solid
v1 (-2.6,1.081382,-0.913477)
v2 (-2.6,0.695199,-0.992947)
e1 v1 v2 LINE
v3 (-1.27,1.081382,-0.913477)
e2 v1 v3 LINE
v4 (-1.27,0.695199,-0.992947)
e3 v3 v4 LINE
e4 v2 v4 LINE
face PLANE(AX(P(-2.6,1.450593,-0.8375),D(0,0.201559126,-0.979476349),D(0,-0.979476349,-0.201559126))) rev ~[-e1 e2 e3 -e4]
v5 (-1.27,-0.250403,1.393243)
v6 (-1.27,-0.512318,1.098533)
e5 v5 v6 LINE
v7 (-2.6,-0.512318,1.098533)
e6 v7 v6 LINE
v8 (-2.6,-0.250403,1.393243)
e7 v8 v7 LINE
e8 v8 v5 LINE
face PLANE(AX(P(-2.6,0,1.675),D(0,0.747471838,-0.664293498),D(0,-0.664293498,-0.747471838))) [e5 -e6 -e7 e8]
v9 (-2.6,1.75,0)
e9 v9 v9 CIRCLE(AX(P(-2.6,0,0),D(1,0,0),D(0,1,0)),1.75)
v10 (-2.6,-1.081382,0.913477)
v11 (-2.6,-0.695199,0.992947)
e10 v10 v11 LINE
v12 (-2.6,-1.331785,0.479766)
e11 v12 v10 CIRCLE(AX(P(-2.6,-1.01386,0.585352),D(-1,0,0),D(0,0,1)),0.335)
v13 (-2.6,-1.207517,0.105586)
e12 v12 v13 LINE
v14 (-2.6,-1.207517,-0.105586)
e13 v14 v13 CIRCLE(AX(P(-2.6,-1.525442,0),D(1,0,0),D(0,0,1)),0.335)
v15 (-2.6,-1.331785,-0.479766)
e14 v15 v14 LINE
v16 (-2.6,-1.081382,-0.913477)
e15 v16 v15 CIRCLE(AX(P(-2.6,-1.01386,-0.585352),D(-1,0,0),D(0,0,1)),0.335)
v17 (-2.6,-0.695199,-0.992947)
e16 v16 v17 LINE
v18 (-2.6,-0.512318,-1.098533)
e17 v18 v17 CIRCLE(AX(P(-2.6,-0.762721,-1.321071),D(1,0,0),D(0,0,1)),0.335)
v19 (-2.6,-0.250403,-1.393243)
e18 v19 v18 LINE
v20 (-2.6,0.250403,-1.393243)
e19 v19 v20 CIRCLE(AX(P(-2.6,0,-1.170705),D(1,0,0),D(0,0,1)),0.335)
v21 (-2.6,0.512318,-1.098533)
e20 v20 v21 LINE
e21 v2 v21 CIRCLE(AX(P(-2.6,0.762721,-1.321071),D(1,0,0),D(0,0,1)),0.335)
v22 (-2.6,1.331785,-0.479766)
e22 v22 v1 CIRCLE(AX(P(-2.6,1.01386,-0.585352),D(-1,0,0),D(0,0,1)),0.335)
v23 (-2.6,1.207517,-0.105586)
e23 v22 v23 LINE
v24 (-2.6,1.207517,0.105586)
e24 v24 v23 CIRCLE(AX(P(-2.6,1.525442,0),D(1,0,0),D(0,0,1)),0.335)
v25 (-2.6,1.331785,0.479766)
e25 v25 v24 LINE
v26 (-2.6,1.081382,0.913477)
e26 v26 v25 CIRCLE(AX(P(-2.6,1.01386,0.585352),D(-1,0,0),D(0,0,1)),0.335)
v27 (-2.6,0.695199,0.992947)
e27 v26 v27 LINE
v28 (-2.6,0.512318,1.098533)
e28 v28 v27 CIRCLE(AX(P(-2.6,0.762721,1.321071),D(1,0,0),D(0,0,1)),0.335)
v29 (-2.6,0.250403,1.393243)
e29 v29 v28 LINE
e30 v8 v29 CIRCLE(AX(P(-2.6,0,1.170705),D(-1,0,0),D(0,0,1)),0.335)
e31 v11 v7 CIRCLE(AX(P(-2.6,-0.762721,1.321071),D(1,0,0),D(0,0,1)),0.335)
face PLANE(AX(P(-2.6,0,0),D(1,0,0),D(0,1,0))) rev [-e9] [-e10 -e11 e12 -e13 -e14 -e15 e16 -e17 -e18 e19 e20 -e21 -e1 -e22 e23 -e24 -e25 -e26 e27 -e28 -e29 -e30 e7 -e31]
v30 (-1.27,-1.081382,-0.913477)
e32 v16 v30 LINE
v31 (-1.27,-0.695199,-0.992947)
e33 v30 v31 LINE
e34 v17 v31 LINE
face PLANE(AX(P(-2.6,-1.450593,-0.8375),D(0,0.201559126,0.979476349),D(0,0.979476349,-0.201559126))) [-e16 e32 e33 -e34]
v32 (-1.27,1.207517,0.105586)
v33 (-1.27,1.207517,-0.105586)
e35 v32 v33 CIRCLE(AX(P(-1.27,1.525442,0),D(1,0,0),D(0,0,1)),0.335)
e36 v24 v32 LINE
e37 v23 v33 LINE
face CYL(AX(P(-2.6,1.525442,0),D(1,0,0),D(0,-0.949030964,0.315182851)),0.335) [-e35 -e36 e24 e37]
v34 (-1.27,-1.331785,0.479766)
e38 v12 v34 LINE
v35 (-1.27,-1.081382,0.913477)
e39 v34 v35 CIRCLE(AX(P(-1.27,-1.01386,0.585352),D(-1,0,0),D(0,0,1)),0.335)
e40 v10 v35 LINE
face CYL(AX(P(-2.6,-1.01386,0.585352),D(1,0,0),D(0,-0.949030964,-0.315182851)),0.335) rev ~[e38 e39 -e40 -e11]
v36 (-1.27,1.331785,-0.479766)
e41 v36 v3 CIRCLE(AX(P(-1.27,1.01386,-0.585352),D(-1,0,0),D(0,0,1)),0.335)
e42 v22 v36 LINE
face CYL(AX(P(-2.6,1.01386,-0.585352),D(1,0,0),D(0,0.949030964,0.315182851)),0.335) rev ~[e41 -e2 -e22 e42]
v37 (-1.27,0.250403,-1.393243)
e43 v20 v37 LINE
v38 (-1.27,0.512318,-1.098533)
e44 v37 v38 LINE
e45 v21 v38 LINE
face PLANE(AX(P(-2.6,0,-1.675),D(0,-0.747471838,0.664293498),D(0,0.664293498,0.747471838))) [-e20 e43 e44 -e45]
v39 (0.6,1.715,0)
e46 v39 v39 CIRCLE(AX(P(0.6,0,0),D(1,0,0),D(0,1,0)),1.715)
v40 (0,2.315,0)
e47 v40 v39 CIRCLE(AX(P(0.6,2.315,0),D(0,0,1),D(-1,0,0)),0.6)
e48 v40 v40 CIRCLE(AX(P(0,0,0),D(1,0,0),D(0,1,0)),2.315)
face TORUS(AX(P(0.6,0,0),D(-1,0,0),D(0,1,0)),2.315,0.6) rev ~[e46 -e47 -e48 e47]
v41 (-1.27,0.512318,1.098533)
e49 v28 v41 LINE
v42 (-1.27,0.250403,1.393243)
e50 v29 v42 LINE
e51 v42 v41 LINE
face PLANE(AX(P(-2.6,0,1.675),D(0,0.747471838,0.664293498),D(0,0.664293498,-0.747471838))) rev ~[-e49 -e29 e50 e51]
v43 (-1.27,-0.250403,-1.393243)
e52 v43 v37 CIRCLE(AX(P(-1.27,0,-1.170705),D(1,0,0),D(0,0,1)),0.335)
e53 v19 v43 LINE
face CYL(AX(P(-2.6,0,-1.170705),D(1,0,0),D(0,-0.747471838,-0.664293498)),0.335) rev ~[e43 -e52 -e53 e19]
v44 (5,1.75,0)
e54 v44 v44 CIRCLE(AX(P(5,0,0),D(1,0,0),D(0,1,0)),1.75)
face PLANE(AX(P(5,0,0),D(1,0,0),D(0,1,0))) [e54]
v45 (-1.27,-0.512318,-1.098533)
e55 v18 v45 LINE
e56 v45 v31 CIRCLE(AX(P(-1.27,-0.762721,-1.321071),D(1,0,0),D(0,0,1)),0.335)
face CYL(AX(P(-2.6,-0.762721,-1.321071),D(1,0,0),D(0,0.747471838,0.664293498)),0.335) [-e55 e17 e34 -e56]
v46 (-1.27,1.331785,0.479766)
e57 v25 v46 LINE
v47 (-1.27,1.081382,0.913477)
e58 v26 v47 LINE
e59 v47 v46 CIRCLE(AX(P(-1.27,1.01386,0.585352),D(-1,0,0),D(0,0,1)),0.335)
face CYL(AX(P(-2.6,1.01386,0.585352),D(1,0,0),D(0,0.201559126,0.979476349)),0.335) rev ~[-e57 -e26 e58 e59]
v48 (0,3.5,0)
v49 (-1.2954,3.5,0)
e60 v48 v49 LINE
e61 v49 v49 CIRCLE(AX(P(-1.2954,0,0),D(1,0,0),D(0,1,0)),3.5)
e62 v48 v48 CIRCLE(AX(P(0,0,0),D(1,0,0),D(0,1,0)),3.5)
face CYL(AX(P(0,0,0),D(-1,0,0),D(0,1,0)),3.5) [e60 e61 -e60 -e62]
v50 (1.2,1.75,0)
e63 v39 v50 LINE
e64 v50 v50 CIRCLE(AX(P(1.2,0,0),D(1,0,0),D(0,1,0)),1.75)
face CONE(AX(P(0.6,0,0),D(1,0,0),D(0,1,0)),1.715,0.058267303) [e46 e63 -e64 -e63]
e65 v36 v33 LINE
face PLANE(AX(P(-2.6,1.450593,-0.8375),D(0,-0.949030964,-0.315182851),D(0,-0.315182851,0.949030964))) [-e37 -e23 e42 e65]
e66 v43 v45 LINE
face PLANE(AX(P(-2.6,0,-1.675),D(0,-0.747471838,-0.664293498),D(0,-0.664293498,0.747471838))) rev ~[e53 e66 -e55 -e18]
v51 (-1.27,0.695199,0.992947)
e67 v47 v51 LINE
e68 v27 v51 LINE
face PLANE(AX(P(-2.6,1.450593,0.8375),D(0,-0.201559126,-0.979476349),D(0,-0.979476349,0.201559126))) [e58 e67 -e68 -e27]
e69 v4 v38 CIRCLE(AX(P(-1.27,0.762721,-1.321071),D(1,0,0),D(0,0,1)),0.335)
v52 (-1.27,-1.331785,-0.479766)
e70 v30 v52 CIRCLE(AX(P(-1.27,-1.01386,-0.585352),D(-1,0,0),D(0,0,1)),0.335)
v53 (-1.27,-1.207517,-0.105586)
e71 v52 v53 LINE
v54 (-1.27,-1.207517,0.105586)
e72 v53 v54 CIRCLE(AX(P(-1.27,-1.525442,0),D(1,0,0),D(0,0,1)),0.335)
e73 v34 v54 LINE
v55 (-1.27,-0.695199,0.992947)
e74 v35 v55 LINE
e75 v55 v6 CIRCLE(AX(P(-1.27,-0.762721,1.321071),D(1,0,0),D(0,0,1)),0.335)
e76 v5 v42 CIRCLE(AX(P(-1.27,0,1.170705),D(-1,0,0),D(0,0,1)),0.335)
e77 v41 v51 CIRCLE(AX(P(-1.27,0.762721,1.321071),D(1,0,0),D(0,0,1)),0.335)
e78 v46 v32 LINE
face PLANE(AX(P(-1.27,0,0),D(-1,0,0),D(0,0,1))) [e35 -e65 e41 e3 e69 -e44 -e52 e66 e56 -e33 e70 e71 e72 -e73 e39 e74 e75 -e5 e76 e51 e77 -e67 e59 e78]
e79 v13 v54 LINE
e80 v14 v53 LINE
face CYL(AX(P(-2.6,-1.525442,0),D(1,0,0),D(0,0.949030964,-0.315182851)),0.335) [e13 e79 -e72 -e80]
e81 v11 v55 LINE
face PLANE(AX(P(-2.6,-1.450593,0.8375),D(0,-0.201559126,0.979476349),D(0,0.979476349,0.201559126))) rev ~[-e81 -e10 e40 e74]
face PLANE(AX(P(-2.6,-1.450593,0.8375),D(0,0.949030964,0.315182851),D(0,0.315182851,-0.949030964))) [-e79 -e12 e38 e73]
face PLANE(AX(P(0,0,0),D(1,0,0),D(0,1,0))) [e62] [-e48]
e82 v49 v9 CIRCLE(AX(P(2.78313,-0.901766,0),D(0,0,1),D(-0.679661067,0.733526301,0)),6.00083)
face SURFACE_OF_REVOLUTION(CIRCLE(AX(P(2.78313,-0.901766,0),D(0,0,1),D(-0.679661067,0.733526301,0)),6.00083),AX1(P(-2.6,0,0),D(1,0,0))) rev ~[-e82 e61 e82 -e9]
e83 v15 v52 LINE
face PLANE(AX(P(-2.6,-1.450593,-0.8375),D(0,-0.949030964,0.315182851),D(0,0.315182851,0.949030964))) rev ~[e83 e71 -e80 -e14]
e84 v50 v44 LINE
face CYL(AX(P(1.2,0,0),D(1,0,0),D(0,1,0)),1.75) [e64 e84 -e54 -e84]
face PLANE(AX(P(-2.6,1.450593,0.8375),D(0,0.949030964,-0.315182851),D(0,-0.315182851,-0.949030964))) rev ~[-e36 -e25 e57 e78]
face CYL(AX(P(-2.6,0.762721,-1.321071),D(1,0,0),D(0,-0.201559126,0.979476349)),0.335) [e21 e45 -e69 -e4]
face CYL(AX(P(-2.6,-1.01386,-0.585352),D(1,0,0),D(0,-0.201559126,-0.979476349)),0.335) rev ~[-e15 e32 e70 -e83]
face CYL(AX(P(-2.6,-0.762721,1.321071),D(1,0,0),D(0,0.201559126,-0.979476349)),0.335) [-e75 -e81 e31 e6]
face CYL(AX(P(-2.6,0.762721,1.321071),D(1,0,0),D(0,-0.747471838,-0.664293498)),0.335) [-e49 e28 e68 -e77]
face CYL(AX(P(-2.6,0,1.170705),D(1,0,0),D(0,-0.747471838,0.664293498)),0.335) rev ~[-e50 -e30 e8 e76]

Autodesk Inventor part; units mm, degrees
ref_plane "YZ Plane" through (0, 0, 0) normal (1, 0, 0) x (0, 1, 0)
ref_plane "XZ Plane" through (0, 0, 0) normal (0, 1, 0) x (-1, 0, 0)
ref_plane "XY Plane" through (0, 0, 0) normal (0, 0, 1) x (1, 0, 0)
sketch "Sketch4" plane through (0, 0, 0) normal (0, 0, 1) x (1, 0, 0)
  line L0 (-2.6, 0) -> (5, 0)
  line L1 (0, 0) -> (-2.6, 0)
  line L2 (0, 3.5) -> (0, 2.315)
  line L3 (0.6, 1.715) -> (0.6, 1.715)
  line L4 (0.6, 1.715) -> (1.2, 1.75)
  arc A0 (0, 2.315) -> (0.6, 1.715) centre (0.6, 2.315) ccw
  line L5 (-2.6, 0) -> (-2.6, 1.75)
  line L6 (0, 3.5) -> (-1.2954, 3.5)
  arc A1 (-1.2954, 3.5) -> (-2.6, 1.75) centre (2.7825, -0.9012) ccw
  line L7 (1.2, 1.75) -> (5, 1.75)
  line L8 (5, 1.75) -> (5, 0)
  point P0 (0, 1.715)
  dimension "d71" = 0.6
  dimension "d72" = 5
  dimension "d74" = 0.6
  dimension "d75" = 3.43
  dimension "d78" = 3.5
  dimension "d82" = 6
  dimension "d83" = 2.6
  dimension "d84" = 7
  dimension "d104" = 3.8
  dimension "d105" = 3.5
revolve "Revolution7" add sketch "Sketch4" angle 360 about axis through (-2.6, 0, 0) along (1, 0, 0)
sketch "Sketch5" plane through (-2.6, 0, 0) normal (-1, 0, 0) x (0, 0, 1)
  circle A0 centre (0, 0) radius 1.675 construction
  circle A1 centre (0, 0) radius 1.1725 construction
  line L0 (0, 0) -> (-1.0154, 0.5862)
  line L1 (0, 0) -> (-1.0154, -0.5862)
  line L2 (-1.8008, 0) -> (1.7887, 0)
  line L3 (-1.675, 0) -> (-1.0154, -0.5862)
  line L4 (-1.675, 0) -> (-1.0154, 0.5862)
  point P0 (0, 0)
  dimension "d88" = 3.35
  dimension "d89" = 2.345
  dimension "d90" = 30
  dimension "d91" = 30
extrude "Extrusion1" cut sketch "Sketch5" against normal blind 1.33
pattern_circular "Circular Pattern1" count 6 over 360 about axis through (-10, 0, 0) along (1, 0, 0) of "Extrusion1"
fillet "Fillet1" radius 0.335 12 edges at (-1.935, -1.4506, -0.8375) (-1.935, -0.5862, -1.0154) (-1.935, -1.1725, 0) (-1.935, -1.4506, 0.8375) (-1.935, -0.5862, 1.0154) (-1.935, 0, 1.675) (-1.935, 1.1725, 0) (-1.935, 1.4506, 0.8375) (-1.935, 0.5863, 1.0154) (-1.935, 0.5862, -1.0154) (-1.935, 0, -1.675) (-1.935, 1.4506, -0.8375)
thread "Thread7" size "M3.5x0.6" class "6g" standard "ISO Metric profile" length 3.8
equation "\"a\" = 1.2"
equation "\"b\" = 3.8"
equation "\"dk\" = 7"
equation "\"k\" = 2.6"
equation "\"r\" = 0.6"
equation "\"rf\" = 6"
equation "\"x\" = 0.6"
equation "\"A_\" = 3.35"
equation "\"t\" = 1.33"
equation "\"p\" = 0.6"
equation "\"l_\" = 5"
equation "\"d\" = 3.5"
equation "\"ds_\" = 3.43"
equation "\"lg\" = 0"
properties part number "Винты со звездообразным углублением в плоско-выпуклой головке ISO 14583 — M3,5 x 5 — 4.8" material "Сталь"
